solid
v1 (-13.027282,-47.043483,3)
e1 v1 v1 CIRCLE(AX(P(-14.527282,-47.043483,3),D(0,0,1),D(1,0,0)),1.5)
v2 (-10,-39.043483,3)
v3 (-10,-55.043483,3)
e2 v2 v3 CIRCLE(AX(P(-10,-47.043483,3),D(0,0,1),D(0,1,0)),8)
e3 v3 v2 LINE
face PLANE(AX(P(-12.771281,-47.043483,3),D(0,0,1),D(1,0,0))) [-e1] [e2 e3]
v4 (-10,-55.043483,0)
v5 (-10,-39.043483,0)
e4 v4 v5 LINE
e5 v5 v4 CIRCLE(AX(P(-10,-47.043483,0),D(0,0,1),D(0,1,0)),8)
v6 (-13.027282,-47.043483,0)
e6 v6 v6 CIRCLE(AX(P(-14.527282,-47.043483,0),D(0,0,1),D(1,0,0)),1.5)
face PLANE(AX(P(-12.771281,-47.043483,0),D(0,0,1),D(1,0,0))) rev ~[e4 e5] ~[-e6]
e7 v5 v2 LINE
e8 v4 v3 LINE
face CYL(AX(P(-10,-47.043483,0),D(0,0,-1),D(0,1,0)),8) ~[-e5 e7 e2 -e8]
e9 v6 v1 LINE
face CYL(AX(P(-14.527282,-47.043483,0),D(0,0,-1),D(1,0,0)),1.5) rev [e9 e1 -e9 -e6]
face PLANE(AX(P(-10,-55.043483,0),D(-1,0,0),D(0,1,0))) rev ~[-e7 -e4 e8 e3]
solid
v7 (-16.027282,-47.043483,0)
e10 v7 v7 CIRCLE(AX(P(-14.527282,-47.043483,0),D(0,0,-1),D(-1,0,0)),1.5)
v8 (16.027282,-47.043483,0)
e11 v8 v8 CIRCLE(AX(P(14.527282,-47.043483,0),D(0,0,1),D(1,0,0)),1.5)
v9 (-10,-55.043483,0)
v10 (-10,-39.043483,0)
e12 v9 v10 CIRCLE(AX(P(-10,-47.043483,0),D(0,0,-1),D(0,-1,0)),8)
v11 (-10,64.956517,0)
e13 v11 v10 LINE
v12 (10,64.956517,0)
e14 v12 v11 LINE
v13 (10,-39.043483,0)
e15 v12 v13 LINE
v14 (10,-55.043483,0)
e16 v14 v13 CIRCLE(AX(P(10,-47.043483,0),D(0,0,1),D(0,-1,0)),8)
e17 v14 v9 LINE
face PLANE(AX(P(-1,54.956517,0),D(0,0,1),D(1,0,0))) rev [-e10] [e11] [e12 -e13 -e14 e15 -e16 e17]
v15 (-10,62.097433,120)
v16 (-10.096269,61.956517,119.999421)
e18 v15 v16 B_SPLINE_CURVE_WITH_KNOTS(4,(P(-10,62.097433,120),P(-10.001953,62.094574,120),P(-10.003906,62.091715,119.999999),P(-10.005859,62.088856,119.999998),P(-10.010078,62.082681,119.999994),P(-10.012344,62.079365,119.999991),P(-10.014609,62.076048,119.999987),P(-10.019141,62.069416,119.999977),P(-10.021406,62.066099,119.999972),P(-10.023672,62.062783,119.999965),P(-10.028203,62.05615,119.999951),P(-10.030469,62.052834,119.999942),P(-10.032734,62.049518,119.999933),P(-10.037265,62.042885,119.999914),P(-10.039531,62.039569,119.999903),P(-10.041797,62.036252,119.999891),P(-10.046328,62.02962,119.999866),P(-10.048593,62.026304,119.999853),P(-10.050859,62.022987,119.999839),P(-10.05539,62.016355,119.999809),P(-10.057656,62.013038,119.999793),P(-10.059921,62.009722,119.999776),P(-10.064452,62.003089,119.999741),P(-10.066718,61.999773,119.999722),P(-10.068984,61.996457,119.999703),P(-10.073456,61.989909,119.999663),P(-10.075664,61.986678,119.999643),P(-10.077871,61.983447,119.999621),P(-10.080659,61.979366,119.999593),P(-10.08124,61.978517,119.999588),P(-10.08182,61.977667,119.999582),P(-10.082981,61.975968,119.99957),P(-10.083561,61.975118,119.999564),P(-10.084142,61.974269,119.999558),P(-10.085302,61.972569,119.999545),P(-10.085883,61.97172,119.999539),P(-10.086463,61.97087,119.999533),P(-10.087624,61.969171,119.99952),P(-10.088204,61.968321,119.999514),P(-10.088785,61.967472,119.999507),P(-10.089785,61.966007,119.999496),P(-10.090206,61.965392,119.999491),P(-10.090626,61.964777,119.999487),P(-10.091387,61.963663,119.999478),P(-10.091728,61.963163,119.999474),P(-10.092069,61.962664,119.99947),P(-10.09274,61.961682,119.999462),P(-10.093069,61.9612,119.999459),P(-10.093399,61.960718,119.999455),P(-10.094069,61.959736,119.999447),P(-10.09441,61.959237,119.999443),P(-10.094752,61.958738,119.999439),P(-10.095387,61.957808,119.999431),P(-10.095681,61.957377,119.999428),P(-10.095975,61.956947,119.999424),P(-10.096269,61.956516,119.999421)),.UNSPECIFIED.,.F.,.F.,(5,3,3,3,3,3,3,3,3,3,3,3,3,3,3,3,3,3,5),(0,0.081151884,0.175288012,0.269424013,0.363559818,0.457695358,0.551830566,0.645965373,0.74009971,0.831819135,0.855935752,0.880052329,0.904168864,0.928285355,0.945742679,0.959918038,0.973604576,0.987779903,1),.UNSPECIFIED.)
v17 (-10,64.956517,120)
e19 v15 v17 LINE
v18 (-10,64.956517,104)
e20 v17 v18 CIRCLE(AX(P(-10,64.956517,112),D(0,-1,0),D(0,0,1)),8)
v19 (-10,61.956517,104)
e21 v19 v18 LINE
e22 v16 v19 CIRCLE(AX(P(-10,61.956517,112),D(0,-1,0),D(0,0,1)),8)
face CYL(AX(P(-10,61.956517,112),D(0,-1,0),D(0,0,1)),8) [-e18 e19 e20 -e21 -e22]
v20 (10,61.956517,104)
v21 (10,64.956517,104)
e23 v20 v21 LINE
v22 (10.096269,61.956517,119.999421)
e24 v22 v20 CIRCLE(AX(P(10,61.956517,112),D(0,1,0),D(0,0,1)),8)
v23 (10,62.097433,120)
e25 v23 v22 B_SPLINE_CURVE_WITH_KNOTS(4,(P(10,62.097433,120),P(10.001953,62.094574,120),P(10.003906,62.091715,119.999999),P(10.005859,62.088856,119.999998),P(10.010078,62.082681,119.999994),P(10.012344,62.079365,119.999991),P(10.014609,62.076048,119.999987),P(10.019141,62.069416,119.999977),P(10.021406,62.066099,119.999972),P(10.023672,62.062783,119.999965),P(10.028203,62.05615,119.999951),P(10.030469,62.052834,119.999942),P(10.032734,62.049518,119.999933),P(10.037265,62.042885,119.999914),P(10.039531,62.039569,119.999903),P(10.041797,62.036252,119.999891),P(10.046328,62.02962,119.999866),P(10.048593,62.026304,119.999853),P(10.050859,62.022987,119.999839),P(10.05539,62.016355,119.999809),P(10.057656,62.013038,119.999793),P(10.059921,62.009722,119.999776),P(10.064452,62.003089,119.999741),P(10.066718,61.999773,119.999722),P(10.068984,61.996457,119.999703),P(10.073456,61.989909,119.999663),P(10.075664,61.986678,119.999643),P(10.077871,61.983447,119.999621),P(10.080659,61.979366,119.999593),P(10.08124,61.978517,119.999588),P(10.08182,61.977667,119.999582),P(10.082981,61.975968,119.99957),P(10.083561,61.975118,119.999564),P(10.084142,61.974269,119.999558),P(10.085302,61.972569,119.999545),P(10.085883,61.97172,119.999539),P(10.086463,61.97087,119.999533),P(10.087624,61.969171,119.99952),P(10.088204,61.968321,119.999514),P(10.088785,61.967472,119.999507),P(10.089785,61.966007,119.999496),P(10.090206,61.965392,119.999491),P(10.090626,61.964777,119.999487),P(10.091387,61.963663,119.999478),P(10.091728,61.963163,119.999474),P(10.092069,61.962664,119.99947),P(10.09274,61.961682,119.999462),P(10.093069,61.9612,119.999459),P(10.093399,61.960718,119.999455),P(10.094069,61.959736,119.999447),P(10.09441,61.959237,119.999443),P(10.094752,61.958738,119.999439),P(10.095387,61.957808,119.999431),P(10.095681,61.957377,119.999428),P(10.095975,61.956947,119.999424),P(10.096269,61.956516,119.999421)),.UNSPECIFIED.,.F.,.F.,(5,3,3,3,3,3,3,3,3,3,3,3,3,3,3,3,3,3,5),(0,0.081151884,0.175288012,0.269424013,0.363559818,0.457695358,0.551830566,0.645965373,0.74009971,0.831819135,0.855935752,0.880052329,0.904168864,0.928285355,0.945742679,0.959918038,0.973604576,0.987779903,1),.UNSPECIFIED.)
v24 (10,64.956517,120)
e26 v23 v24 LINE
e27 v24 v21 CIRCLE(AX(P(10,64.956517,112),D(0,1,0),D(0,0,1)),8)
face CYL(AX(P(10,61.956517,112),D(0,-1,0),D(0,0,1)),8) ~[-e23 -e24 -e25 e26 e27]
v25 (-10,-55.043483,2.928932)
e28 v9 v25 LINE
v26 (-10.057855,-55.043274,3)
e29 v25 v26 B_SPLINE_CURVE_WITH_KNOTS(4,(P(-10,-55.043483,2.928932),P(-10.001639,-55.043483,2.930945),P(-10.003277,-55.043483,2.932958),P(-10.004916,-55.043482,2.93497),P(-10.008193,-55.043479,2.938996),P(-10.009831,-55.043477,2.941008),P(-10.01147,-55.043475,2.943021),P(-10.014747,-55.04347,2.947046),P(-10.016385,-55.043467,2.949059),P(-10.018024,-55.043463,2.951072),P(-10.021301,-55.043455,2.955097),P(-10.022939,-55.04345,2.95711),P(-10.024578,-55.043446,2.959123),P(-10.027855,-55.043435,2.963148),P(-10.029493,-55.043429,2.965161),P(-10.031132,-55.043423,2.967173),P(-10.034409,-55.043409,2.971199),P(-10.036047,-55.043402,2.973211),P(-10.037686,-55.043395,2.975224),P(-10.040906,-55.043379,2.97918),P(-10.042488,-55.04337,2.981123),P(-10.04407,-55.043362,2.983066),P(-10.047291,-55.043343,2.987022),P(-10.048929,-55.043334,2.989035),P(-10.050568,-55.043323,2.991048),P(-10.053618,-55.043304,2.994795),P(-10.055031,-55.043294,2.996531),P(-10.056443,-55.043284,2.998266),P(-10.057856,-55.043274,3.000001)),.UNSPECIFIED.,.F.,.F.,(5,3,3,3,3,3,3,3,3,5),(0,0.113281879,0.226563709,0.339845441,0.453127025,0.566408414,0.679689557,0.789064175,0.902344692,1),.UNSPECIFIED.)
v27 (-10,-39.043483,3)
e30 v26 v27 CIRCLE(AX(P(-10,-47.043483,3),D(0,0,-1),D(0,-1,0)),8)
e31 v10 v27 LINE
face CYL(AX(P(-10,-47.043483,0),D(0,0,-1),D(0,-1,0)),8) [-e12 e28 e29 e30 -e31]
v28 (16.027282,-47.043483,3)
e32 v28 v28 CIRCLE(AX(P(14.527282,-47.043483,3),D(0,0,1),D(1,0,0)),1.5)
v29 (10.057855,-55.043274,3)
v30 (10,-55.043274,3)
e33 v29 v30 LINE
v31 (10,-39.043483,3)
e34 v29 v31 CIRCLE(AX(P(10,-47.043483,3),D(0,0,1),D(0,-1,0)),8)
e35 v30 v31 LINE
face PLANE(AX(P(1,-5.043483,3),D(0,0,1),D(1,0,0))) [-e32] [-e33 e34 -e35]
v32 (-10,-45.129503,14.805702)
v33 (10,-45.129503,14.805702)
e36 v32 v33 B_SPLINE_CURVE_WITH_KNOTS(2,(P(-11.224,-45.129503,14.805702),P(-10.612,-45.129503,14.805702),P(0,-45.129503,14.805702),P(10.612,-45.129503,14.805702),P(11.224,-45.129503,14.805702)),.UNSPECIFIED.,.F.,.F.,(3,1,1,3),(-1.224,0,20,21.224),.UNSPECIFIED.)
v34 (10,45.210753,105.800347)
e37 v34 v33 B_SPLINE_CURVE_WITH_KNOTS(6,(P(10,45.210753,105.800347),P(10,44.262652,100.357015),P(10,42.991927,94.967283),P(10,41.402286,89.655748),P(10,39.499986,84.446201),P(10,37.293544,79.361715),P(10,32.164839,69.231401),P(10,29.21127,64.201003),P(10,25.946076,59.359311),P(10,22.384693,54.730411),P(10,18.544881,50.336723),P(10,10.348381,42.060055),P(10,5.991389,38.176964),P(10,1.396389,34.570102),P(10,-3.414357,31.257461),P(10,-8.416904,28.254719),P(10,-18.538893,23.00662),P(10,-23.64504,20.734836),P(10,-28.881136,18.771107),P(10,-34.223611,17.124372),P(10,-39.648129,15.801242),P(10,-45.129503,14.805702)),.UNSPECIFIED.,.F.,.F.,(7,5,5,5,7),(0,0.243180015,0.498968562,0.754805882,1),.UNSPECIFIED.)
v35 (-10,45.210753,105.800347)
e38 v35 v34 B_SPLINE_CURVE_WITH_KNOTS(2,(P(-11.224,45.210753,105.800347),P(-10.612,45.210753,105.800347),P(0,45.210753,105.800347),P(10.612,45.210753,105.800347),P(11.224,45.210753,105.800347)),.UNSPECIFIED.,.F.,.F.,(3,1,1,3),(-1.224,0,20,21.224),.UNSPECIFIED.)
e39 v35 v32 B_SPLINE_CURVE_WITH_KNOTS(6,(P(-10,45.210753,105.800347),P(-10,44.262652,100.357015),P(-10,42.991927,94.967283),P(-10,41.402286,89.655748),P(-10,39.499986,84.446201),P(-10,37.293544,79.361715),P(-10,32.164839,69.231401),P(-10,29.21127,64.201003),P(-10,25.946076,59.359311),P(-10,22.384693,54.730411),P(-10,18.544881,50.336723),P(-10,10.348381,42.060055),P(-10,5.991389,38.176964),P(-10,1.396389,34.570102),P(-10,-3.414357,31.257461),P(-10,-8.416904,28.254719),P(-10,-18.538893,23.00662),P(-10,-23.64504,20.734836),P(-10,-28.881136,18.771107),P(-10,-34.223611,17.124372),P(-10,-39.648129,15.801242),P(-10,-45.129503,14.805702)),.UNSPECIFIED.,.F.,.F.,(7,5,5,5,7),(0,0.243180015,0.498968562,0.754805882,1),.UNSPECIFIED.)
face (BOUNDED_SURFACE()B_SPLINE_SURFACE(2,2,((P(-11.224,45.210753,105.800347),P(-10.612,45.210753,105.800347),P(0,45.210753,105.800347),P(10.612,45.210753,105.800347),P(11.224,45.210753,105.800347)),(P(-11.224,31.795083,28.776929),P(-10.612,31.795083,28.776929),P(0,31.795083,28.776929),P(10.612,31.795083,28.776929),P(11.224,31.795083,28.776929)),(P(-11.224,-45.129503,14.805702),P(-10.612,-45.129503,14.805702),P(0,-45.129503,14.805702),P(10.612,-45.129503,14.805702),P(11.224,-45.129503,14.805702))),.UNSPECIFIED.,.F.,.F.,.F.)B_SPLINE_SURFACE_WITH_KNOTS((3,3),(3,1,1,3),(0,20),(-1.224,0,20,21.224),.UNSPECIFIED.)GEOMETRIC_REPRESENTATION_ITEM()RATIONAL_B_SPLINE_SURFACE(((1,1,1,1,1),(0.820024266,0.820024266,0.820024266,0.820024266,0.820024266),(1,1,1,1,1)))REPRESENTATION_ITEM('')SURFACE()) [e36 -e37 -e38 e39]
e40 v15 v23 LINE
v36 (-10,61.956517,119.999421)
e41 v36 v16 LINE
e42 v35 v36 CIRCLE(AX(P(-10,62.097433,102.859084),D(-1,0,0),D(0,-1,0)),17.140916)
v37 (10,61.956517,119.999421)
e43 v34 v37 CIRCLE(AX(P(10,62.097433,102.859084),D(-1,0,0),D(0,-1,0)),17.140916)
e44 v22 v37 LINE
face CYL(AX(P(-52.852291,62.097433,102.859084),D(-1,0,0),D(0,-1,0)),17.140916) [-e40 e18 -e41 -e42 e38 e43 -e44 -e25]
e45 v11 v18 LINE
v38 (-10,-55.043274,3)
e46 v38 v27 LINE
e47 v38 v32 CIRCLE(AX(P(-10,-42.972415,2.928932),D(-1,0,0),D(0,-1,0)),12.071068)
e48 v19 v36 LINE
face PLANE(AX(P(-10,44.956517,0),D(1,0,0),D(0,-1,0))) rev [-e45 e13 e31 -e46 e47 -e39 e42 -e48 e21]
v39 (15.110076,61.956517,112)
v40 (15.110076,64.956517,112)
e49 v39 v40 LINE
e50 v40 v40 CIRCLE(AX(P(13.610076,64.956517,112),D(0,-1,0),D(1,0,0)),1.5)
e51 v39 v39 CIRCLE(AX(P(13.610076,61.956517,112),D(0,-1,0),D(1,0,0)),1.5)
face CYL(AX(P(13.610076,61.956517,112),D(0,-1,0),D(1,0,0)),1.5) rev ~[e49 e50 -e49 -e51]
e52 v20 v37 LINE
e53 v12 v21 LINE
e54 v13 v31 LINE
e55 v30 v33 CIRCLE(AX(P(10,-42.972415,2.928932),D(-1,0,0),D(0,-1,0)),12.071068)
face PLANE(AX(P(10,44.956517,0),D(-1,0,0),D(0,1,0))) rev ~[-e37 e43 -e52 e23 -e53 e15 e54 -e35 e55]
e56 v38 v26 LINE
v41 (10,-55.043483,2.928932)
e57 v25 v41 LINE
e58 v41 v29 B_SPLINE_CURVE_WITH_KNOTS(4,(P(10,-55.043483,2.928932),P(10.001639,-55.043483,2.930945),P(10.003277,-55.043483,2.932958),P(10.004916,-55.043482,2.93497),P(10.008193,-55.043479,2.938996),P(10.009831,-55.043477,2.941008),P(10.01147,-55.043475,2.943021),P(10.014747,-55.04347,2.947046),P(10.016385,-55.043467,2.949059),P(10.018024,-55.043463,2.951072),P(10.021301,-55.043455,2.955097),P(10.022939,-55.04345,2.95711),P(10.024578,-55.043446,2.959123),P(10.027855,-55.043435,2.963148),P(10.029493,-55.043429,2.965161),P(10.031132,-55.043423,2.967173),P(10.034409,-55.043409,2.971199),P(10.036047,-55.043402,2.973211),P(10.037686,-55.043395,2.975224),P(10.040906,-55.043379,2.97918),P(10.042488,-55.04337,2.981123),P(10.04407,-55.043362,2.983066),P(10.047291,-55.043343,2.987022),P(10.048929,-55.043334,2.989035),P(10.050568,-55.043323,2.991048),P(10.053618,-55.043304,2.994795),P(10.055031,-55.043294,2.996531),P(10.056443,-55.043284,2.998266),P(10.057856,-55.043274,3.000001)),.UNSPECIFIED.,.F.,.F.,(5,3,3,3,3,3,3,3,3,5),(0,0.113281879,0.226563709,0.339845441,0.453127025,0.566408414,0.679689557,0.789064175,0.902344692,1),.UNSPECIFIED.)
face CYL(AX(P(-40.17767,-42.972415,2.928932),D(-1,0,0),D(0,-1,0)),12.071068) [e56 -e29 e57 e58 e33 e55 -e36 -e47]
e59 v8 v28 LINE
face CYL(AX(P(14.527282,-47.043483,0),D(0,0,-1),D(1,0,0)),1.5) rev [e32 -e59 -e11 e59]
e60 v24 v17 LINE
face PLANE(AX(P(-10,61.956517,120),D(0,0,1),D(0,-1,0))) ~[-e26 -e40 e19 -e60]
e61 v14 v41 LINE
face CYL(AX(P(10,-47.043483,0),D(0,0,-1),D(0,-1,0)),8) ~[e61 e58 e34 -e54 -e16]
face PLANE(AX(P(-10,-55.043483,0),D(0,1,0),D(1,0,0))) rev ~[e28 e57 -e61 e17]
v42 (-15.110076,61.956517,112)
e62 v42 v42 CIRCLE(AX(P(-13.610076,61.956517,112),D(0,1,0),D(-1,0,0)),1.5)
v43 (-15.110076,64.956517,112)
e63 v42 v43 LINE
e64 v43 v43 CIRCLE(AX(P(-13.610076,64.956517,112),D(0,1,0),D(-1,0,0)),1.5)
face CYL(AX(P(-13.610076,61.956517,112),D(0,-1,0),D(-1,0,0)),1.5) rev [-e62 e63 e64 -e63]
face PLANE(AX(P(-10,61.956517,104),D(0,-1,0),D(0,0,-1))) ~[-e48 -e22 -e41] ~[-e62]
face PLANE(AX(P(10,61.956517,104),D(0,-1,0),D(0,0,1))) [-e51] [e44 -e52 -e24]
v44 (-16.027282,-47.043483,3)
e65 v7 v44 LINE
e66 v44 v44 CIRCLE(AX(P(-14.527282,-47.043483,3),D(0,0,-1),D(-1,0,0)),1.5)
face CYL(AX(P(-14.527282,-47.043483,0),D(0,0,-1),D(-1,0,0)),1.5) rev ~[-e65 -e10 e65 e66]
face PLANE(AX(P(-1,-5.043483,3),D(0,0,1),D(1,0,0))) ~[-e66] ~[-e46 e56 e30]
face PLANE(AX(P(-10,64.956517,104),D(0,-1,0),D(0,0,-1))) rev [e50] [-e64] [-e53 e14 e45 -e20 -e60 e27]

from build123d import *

# Parameters (mm, degrees)
F1_DEPTH     = 15
F0_R         = 1.5
F2_DEPTH     = 3
F0_W         = 2
F0_H         = 3
F3_DEPTH     = 120
F4_DEPTH     = 120
F5_W         = 3
F5_H         = 16
F6_DEPTH     = 17
F8_DEPTH     = 3
F7_R         = 1.5
F9_DEPTH     = 3
F12_T1_DEPTH = 105.7045814642
F13_T1_DEPTH = 80.3553390593
F14_R        = 112.0195092941


# Not quite as in the source:
# - a fillet or chamfer that OpenCascade refuses, or shapes differently, is made with other operations: its cross-section is extruded or revolved along the edge and cut away or added
# - a feature names something its author has since deleted; it is built from what else it names


with BuildPart() as f1:
    # F0 (on Top) → F1 (new body)
    with BuildSketch(Plane.XY):
        Polygon((-8, 44.9565169007), (-10, 44.9565169007), (-10, -39.0434830993), (-10, -55.0434830993), (-8, -55.0434830993), align=None)
        Polygon((10, -39.0434830993), (10, 44.9565169007), (-8, 44.9565169007), (-8, -55.0434830993), (10, -55.0434830993), align=None)
    extrude(amount=F1_DEPTH)

    # F0 (on Top) → F2 (join)
    with BuildSketch(Plane.XY):
        Polygon((10, -39.0434830993), (10, 44.9565169007), (-8, 44.9565169007), (-8, -55.0434830993), (10, -55.0434830993), align=None)
        with BuildLine():
            ThreePointArc((10, -55.0434830993), (18, -47.0434830993), (10, -39.0434830993))
            Line((10, -39.0434830993), (10, -55.0434830993))
        make_face()
        with Locations((14.5272817463, -47.0434830993)):
            Circle(F0_R, mode=Mode.SUBTRACT)
    extrude(amount=F2_DEPTH)

    # F0 (on Top) → F3 (join)
    with BuildSketch(Plane.XY):
        Polygon((10, 64.9565169007), (-8, 64.9565169007), (-8, 61.9565169007), (-8, 44.9565169007), (10, 44.9565169007), align=None)
        with Locations((-9, 63.4565169007)):
            Rectangle(F0_W, F0_H)
    extrude(amount=F3_DEPTH)

    # F0 (on Top) → F4 (join, through all)
    with BuildSketch(Plane.XY):
        with Locations((-9, 63.4565169007)):
            Rectangle(F0_W, F0_H)
    extrude(amount=F4_DEPTH)

    # F5 (on face) → F6 (join)
    with BuildSketch(Plane.YZ.offset(10)):
        with Locations((63.4565169007, 112)):
            Rectangle(F5_W, F5_H)
    extrude(amount=F6_DEPTH)

    # F7 (on face) → F8 (cut, through all)
    with BuildSketch(Plane.XZ.offset(-61.9565169007)):
        with BuildLine():
            ThreePointArc((10, 120), (18, 112), (10, 104))
            Line((10, 104), (27, 104))
            Line((27, 104), (27, 120))
            Line((27, 120), (10, 120))
        make_face()
    extrude(amount=-F8_DEPTH, mode=Mode.SUBTRACT)

    # F7 (on face) → F9 (cut, through all)
    with BuildSketch(Plane.XZ.offset(-61.9565169007)):
        with Locations((13.6100761592, 112)):
            Circle(F7_R)
    extrude(amount=-F9_DEPTH, mode=Mode.SUBTRACT)

    # F11: F1 across plane


with BuildPart() as f2:
    # F0 (on Top) → F2, piece 2 (new body)
    with BuildSketch(Plane.XY):
        with BuildLine():
            Line((-10, -55.0434830993), (-10, -39.0434830993))
            ThreePointArc((-10, -39.0434830993), (-18, -47.0434830993), (-10, -55.0434830993))
        make_face()
        with Locations((-14.5272817463, -47.0434830993)):
            Circle(F0_R, mode=Mode.SUBTRACT)
    extrude(amount=F2_DEPTH)


with BuildPart() as f1_1:
    add(f1.part)
    add(f1.part.mirror(Plane(origin=(0, 64.9565169007, 120), x_dir=(0, 1, 0), z_dir=(1, 0, 0))))

    # F12: fillet of radius 17.1409162928 on 1 edges, made by hand

    # F12_s2 → F12_t1 (cut)
    with BuildSketch(Plane.YZ.offset(-52.8522907321)):
        with BuildLine():
            ThreePointArc((44.9565169007, 102.8590837072), (49.9769750471, 114.9795418536), (62.0974331935, 120))
            Line((62.0974331935, 120), (44.9565169007, 120))
            Line((44.9565169007, 120), (44.9565169007, 102.8590837072))
        make_face()
    extrude(amount=F12_T1_DEPTH, mode=Mode.SUBTRACT)

    # F13: fillet of radius 12.0710678119 on 1 edges, made by hand

    # F13_s2 → F13_t1 (cut)
    with BuildSketch(Plane.YZ.offset(-40.1776695297)):
        with BuildLine():
            ThreePointArc((-55.0434830993, 2.9289321881), (-51.5079491934, 11.4644660941), (-42.9724152874, 15))
            Line((-42.9724152874, 15), (-55.0434830993, 15))
            Line((-55.0434830993, 15), (-55.0434830993, 2.9289321881))
        make_face()
    extrude(amount=F13_T1_DEPTH, mode=Mode.SUBTRACT)

    # F14
    f14_edges = [f1_1.edges().sort_by_distance(p)[0] for p in [
        (0, 44.956517, 15),
    ]]
    fillet(f14_edges, radius=F14_R)


solid = Compound([f2.part, f1_1.part])
